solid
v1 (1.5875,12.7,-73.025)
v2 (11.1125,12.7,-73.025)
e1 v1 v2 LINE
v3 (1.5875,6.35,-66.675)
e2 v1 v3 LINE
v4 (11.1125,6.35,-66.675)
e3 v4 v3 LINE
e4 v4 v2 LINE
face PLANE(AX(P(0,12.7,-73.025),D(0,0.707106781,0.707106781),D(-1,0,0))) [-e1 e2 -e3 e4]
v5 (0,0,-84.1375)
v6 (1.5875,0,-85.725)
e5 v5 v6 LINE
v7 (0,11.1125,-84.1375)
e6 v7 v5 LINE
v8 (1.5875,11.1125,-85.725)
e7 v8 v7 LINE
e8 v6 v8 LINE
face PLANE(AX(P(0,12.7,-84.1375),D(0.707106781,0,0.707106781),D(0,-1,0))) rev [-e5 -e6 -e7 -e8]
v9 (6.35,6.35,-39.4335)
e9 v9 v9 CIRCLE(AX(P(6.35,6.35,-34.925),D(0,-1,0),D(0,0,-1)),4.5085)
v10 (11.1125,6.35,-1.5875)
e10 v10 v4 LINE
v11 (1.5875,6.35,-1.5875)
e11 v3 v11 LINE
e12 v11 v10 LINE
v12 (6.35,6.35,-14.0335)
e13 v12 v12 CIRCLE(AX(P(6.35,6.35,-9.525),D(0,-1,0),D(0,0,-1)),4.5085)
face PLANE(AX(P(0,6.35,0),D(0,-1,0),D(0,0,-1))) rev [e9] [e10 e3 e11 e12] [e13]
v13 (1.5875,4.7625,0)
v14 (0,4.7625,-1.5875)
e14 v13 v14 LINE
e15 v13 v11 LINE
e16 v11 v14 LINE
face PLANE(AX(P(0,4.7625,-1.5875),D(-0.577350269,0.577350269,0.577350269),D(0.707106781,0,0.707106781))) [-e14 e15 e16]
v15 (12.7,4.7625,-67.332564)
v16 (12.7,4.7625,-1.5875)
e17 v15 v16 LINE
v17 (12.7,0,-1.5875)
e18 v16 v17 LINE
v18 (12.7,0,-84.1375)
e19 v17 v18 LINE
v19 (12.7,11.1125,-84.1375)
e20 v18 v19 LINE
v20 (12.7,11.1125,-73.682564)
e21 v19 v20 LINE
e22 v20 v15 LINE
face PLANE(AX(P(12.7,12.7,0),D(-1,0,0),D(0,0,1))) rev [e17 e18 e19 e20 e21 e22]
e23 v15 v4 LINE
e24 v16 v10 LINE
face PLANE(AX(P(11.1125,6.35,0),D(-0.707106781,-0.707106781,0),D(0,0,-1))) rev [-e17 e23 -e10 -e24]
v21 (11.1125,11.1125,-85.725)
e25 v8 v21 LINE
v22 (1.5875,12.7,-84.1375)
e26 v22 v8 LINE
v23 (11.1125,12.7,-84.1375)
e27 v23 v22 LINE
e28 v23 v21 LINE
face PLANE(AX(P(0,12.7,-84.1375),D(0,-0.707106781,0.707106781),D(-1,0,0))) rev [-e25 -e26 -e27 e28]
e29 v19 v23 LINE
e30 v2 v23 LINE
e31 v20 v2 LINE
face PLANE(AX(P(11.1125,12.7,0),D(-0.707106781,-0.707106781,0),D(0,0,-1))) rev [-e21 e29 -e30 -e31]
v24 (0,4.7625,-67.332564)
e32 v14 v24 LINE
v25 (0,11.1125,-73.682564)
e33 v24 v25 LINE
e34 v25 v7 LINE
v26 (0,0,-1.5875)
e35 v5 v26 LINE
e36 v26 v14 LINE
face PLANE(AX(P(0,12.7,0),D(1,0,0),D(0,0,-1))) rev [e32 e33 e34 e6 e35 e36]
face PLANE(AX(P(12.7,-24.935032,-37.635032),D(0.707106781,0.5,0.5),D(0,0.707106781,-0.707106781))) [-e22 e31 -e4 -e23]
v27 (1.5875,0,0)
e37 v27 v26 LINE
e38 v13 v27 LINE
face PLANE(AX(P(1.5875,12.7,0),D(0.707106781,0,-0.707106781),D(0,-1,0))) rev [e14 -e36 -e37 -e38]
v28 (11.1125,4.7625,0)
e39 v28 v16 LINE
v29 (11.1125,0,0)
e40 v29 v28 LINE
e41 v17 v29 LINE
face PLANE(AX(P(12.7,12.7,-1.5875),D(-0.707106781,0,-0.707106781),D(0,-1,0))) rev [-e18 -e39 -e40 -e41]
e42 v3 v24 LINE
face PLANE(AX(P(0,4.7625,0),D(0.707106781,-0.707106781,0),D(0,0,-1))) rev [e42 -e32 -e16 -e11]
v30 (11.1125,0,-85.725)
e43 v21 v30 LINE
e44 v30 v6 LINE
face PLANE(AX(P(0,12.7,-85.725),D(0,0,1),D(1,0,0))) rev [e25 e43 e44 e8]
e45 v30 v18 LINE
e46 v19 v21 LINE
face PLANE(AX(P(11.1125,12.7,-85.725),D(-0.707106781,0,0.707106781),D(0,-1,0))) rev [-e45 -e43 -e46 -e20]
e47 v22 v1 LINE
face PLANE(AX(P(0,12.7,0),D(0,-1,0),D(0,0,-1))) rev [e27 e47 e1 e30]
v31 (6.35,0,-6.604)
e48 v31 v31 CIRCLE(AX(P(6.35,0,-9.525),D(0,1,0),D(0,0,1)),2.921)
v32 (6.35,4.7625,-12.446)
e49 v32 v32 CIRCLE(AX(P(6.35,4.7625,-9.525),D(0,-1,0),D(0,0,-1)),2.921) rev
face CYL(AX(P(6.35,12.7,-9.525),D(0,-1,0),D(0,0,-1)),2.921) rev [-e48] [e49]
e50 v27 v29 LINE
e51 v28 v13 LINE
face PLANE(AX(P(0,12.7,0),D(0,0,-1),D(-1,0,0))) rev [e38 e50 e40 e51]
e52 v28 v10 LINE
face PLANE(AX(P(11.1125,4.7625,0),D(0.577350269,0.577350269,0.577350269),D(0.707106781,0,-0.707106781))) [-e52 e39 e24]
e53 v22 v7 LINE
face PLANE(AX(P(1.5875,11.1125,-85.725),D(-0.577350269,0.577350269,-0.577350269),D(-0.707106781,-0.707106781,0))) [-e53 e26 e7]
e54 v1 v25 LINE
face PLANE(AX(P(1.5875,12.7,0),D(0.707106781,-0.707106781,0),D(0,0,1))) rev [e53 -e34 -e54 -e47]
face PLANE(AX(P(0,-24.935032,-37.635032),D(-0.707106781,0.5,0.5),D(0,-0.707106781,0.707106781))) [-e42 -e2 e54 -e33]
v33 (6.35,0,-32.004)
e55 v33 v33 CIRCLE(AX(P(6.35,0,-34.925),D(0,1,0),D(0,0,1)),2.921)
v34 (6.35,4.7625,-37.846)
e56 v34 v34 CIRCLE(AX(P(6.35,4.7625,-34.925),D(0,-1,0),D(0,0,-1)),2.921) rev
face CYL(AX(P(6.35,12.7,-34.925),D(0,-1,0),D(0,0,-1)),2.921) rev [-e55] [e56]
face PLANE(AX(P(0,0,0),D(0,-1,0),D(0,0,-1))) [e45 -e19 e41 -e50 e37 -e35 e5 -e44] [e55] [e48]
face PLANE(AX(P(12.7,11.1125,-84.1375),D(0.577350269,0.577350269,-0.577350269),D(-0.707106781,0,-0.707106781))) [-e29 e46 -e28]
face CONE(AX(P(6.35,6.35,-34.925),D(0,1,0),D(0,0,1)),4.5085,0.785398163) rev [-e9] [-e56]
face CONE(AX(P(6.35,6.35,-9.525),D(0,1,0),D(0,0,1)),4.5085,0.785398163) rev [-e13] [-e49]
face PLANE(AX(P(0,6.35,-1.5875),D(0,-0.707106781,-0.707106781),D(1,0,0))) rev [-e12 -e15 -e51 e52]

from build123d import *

# Parameters (mm, degrees)
SKETCH1_W           = 12.7
SKETCH1_H           = 85.725
SKETCH1_R           = 2.921
BOSS_EXTRUDE1_DEPTH = 12.7
SKETCH2_W           = 73.025
SKETCH2_H           = 6.35
CUT_EXTRUDE1_DEPTH  = 88.586275323
CHAMFER1_SIZE       = 6.35


# Some blends are built 0.0001 mm under size
with BuildPart() as part:
    # Sketch1 → Boss-Extrude1 (new body)
    with BuildSketch(Plane(origin=(0, 0, 0), x_dir=(1, 0, 0), z_dir=(0, 1, 0))):
        with Locations((6.35, 42.8625)):
            Rectangle(SKETCH1_W, SKETCH1_H)
        with Locations(Location((6.35, 9.525, 0), (0, 0, 270))):
            Circle(SKETCH1_R, mode=Mode.SUBTRACT)
        with Locations(Location((6.35, 34.925, 0), (0, 0, 270))):
            Circle(SKETCH1_R, mode=Mode.SUBTRACT)
    extrude(amount=BOSS_EXTRUDE1_DEPTH)

    # Sketch2 → Cut-Extrude1 (cut, through all)
    with BuildSketch(Plane(origin=(12.7, 0, 0), x_dir=(0, 0, -1), z_dir=(1, 0, 0))):
        with Locations((36.5125, 9.525)):
            Rectangle(SKETCH2_W, SKETCH2_H)
    extrude(amount=-CUT_EXTRUDE1_DEPTH, mode=Mode.SUBTRACT)

    # Chamfer1
    chamfer1_edges = [part.edges().sort_by_distance(p)[0] for p in [
        (6.35, 6.35, -73.025),
    ]]
    chamfer(chamfer1_edges, length=CHAMFER1_SIZE - 0.0001)  # a hair under: the kernel refuses the full size

    # Chamfer2
    # the kernel refuses this chamfer: 1.5875 mm, written as the material it takes off along each edge
    with BuildSketch(Plane(origin=(11.641666667, 11.641666667, -84.666666667), x_dir=(-0.7071067811865476, 0.7071067811865476, 0), z_dir=(0.5773502691896264, 0.5773502691896264, -0.5773502691896245)), Plane(origin=(1.058333333, 5.291666667, -1.058333333), x_dir=(0.7071067811865476, 0.7071067811865476, 0), z_dir=(-0.5773502691896265, 0.5773502691896265, 0.5773502691896244))) as chamfer2_piece_1:
        Polygon((-1.122532015, 0.648094161), (1.122532015, 0.648094161), (0, -1.296188322), align=None)
    extrude(amount=2.016395815, mode=Mode.SUBTRACT)
    with BuildSketch(Plane(origin=(1.058333333, 11.641666667, -84.666666667), x_dir=(0.7071067811865476, 0.7071067811865476, 0), z_dir=(-0.5773502691896264, 0.5773502691896264, -0.5773502691896245)), Plane(origin=(11.641666667, 5.291666667, -1.058333333), x_dir=(-0.7071067811865476, 0.7071067811865476, -2.571490011072639e-15), z_dir=(0.577350269189625, 0.5773502691896271, 0.5773502691896252))) as chamfer2_piece_2:
        Polygon((-1.122532015, -0.648094161), (1.122532015, -0.648094161), (0, 1.296188322), align=None)
    extrude(amount=2.016395815, mode=Mode.SUBTRACT)
    with BuildSketch(Plane(origin=(16.782546743, 12.7, -85.725), x_dir=(0, 0.027495876610586667, 0.9996219169112968), z_dir=(-1, 0, 0)), Plane(origin=(0, 12.7, -89.807546743), x_dir=(0.9996219169112968, 0.02749587661058674, 0), z_dir=(0, 0, 1)), Plane(origin=(0, -4.082546743, -85.725), x_dir=(0.9996219169112968, 0, -0.02749587661058565), z_dir=(0, 1, 0)), Plane(origin=(12.7, -4.082546743, -85.725), x_dir=(0.027495876610586667, 0, 0.9996219169112968), z_dir=(0, 1, 0))) as chamfer2_piece_3:
        with BuildLine():
            Line((1.633018697, 0), (-0.089768608, -1.630549497))
            Line((-0.089768608, -1.630549497), (-0.121506604, -1.629676503))
            ThreePointArc((-0.121506604, -1.629676503), (-0.054180148, -0.815019055), (-0.031737996, 0.000872994))
            Line((-0.031737996, 0.000872994), (0.000872994, 0.031737996))
            ThreePointArc((0.000872994, 0.031737996), (0.816765043, 0.009295844), (1.633891691, 0.031737996))
            Line((1.633891691, 0.031737996), (1.633018697, 0))
        make_face()
    extrude(amount=20.865093487, mode=Mode.SUBTRACT)
    with BuildSketch(Plane(origin=(12.7, 12.7, -68.942453257), x_dir=(0.027495876610586726, -0.9996219169112968, 0), z_dir=(0, 0, -1)), Plane(origin=(16.782546743, 6.35, 0), x_dir=(0, 0.027495876610586098, -0.9996219169112966), z_dir=(-1, 0, 0))) as chamfer2_piece_4:
        with BuildLine():
            Line((1.633018697, 0), (-0.089768608, 1.630549497))
            Line((-0.089768608, 1.630549497), (-0.121506604, 1.629676503))
            ThreePointArc((-0.121506604, 1.629676503), (-0.054180148, 0.815019055), (-0.031737996, -0.000872994))
            Line((-0.031737996, -0.000872994), (0.000872994, -0.031737996))
            ThreePointArc((0.000872994, -0.031737996), (0.816765043, -0.009295844), (1.633891691, -0.031737996))
            Line((1.633891691, -0.031737996), (1.633018697, 0))
        make_face()
    extrude(amount=20.865093487, mode=Mode.SUBTRACT)
    with BuildSketch(Plane(origin=(12.7, -4.082546743, 0), x_dir=(0.027495876610586743, 0, -0.9996219169112966), z_dir=(0, 1, 0)), Plane(origin=(0, -4.082546743, 0), x_dir=(0.9996219169112966, 0, 0.027495876610586424), z_dir=(0, 1, 0))) as chamfer2_piece_5:
        with BuildLine():
            Line((1.633018697, 0), (-0.089768608, 1.630549497))
            Line((-0.089768608, 1.630549497), (-0.121506604, 1.629676503))
            ThreePointArc((-0.121506604, 1.629676503), (-0.054180148, 0.815019055), (-0.031737996, -0.000872994))
            Line((-0.031737996, -0.000872994), (0.000872994, -0.031737996))
            ThreePointArc((0.000872994, -0.031737996), (0.816765043, -0.009295844), (1.633891691, -0.031737996))
            Line((1.633891691, -0.031737996), (1.633018697, 0))
        make_face()
    extrude(amount=14.515093487, mode=Mode.SUBTRACT)
    with BuildSketch(Plane(origin=(6.35, 6.35, -9.525), x_dir=(0, 0, 1), z_dir=(1, 0, 0))) as chamfer2_piece_6:
        with BuildLine():
            Line((4.553401281, -0.044901281), (2.876098719, 1.632401281))
            Line((2.876098719, 1.632401281), (2.844348719, 1.632401281))
            ThreePointArc((2.844348719, 1.632401281), (2.88925, 0.81620064), (2.88925, 0))
            Line((2.88925, 0), (2.921, -0.03175))
            ThreePointArc((2.921, -0.03175), (3.73720064, -0.03175), (4.553401281, -0.076651281))
            Line((4.553401281, -0.076651281), (4.553401281, -0.044901281))
        make_face()
    revolve(axis=Axis((6.35, 6.35, -9.525), (0, -1, 0)), mode=Mode.SUBTRACT)
    with BuildSketch(Plane(origin=(6.35, 6.35, -34.925), x_dir=(0, 0, 1), z_dir=(1, 0, 0))) as chamfer2_piece_7:
        with BuildLine():
            Line((4.553401281, -0.044901281), (2.876098719, 1.632401281))
            Line((2.876098719, 1.632401281), (2.844348719, 1.632401281))
            ThreePointArc((2.844348719, 1.632401281), (2.88925, 0.81620064), (2.88925, 0))
            Line((2.88925, 0), (2.921, -0.03175))
            ThreePointArc((2.921, -0.03175), (3.73720064, -0.03175), (4.553401281, -0.076651281))
            Line((4.553401281, -0.076651281), (4.553401281, -0.044901281))
        make_face()
    revolve(axis=Axis((6.35, 6.35, -34.925), (0, -1, 0)), mode=Mode.SUBTRACT)
    with BuildSketch(Plane(origin=(0, 6.35, -70.757646743), x_dir=(0.9996219169112968, 0.027495876610586195, 0), z_dir=(0, 0, 1))) as chamfer2_piece_8_section:
        with BuildLine():
            Line((1.633018697, 0), (-0.089768608, -1.630549497))
            Line((-0.089768608, -1.630549497), (-0.121506604, -1.629676503))
            ThreePointArc((-0.121506604, -1.629676503), (-0.054180148, -0.815019055), (-0.031737996, 0.000872994))
            Line((-0.031737996, 0.000872994), (0.000872994, 0.031737996))
            ThreePointArc((0.000872994, 0.031737996), (0.816765043, 0.009295844), (1.633891691, 0.031737996))
            Line((1.633891691, 0.031737996), (1.633018697, 0))
        make_face()
    chamfer2_piece_8 = extrude(amount=74.840193487, mode=Mode.PRIVATE)
    chamfer2_piece_8 = split(chamfer2_piece_8, bisect_by=Plane(origin=(0.524765539, -11.730363263, -48.594736737), z_dir=(0, 0.7071067811865479, 0.7071067811865472)), keep=Keep.TOP, mode=Mode.PRIVATE)
    add(chamfer2_piece_8, mode=Mode.SUBTRACT)
    with BuildSketch(Plane(origin=(12.7, 6.35, -70.757646743), x_dir=(0.02749587661058674, -0.9996219169112966, 0), z_dir=(0, 0, 1))) as chamfer2_piece_9_section:
        with BuildLine():
            Line((1.633018697, 0), (-0.089768608, -1.630549497))
            Line((-0.089768608, -1.630549497), (-0.121506604, -1.629676503))
            ThreePointArc((-0.121506604, -1.629676503), (-0.054180148, -0.815019055), (-0.031737996, 0.000872994))
            Line((-0.031737996, 0.000872994), (0.000872994, 0.031737996))
            ThreePointArc((0.000872994, 0.031737996), (0.816765043, 0.009295844), (1.633891691, 0.031737996))
            Line((1.633891691, 0.031737996), (1.633018697, 0))
        make_face()
    chamfer2_piece_9 = extrude(amount=74.840193487, mode=Mode.PRIVATE)
    chamfer2_piece_9 = split(chamfer2_piece_9, bisect_by=Plane(origin=(12.175234461, -11.730363263, -48.594736737), z_dir=(0, 0.7071067811865479, 0.7071067811865472)), keep=Keep.TOP, mode=Mode.PRIVATE)
    add(chamfer2_piece_9, mode=Mode.SUBTRACT)
    with BuildSketch(Plane(origin=(12.7, 3.463203513, -63.788303513), x_dir=(0.02749587661058664, -0.7068394360706738, -0.7068394360706732), z_dir=(0, 0.7071067811865472, -0.7071067811865479))) as chamfer2_piece_10_section:
        with BuildLine():
            Line((1.633018697, 0), (-0.089768608, 1.630549497))
            Line((-0.089768608, 1.630549497), (-0.121506604, 1.629676503))
            ThreePointArc((-0.121506604, 1.629676503), (-0.054180148, 0.815019055), (-0.031737996, -0.000872994))
            Line((-0.031737996, -0.000872994), (0.000872994, -0.031737996))
            ThreePointArc((0.000872994, -0.031737996), (0.816765043, -0.009295844), (1.633891691, -0.031737996))
            Line((1.633891691, -0.031737996), (1.633018697, 0))
        make_face()
    chamfer2_piece_10 = extrude(amount=17.145208187, mode=Mode.PRIVATE)
    chamfer2_piece_10 = split(chamfer2_piece_10, bisect_by=Plane(origin=(12.154882998, 6.35, -70.191724347), z_dir=(0, 1, 0)), keep=Keep.TOP, mode=Mode.PRIVATE)
    add(chamfer2_piece_10, mode=Mode.SUBTRACT)
    with BuildSketch(Plane(origin=(0, 3.463203513, -63.788303513), x_dir=(0.9996219169112968, 0.019442520806014586, 0.019442520806014572), z_dir=(0, 0.7071067811865472, -0.7071067811865479))) as chamfer2_piece_11_section:
        with BuildLine():
            Line((1.633018697, 0), (-0.089768608, 1.630549497))
            Line((-0.089768608, 1.630549497), (-0.121506604, 1.629676503))
            ThreePointArc((-0.121506604, 1.629676503), (-0.054180148, 0.815019055), (-0.031737996, -0.000872994))
            Line((-0.031737996, -0.000872994), (0.000872994, -0.031737996))
            ThreePointArc((0.000872994, -0.031737996), (0.816765043, -0.009295844), (1.633891691, -0.031737996))
            Line((1.633891691, -0.031737996), (1.633018697, 0))
        make_face()
    chamfer2_piece_11 = extrude(amount=17.145208187, mode=Mode.PRIVATE)
    chamfer2_piece_11 = split(chamfer2_piece_11, bisect_by=Plane(origin=(0.545117002, 6.35, -70.191724347), z_dir=(0, 1, 0)), keep=Keep.TOP, mode=Mode.PRIVATE)
    add(chamfer2_piece_11, mode=Mode.SUBTRACT)
    with BuildSketch(Plane(origin=(0, 3.463203513, -63.788303513), x_dir=(0.9996219169112968, 0.019442520806014586, 0.019442520806014572), z_dir=(0, 0.7071067811865472, -0.7071067811865479))) as chamfer2_piece_12a_section:
        with BuildLine():
            Line((1.633018697, 0), (-0.089768608, 1.630549497))
            Line((-0.089768608, 1.630549497), (-0.121506604, 1.629676503))
            ThreePointArc((-0.121506604, 1.629676503), (-0.054180148, 0.815019055), (-0.031737996, -0.000872994))
            Line((-0.031737996, -0.000872994), (0.000872994, -0.031737996))
            ThreePointArc((0.000872994, -0.031737996), (0.816765043, -0.009295844), (1.633891691, -0.031737996))
            Line((1.633891691, -0.031737996), (1.633018697, 0))
        make_face()
    chamfer2_piece_12a = extrude(amount=17.145208187, mode=Mode.PRIVATE)
    chamfer2_piece_12a = split(chamfer2_piece_12a, bisect_by=Plane(origin=(0.504972836, 6.35, -65.823859696), z_dir=(0, -1, 0)), keep=Keep.TOP, mode=Mode.PRIVATE)
    with BuildSketch(Plane(origin=(0, 6.35, -70.757646743), x_dir=(0.9996219169112968, 0.027495876610586195, 0), z_dir=(0, 0, 1))) as chamfer2_piece_12b_section:
        with BuildLine():
            Line((1.633018697, 0), (-0.089768608, -1.630549497))
            Line((-0.089768608, -1.630549497), (-0.121506604, -1.629676503))
            ThreePointArc((-0.121506604, -1.629676503), (-0.054180148, -0.815019055), (-0.031737996, 0.000872994))
            Line((-0.031737996, 0.000872994), (0.000872994, 0.031737996))
            ThreePointArc((0.000872994, 0.031737996), (0.816765043, 0.009295844), (1.633891691, 0.031737996))
            Line((1.633891691, 0.031737996), (1.633018697, 0))
        make_face()
    chamfer2_piece_12b = extrude(amount=74.840193487, mode=Mode.PRIVATE)
    chamfer2_piece_12b = split(chamfer2_piece_12b, bisect_by=Plane(origin=(0.504972836, 6.951917791, -67.277017791), z_dir=(0, -0.7071067811865479, -0.7071067811865472)), keep=Keep.TOP, mode=Mode.PRIVATE)
    chamfer2_piece_12 = chamfer2_piece_12a & chamfer2_piece_12b
    add(chamfer2_piece_12, mode=Mode.SUBTRACT)
    with BuildSketch(Plane(origin=(12.7, 3.463203513, -63.788303513), x_dir=(0.02749587661058664, -0.7068394360706738, -0.7068394360706732), z_dir=(0, 0.7071067811865472, -0.7071067811865479))) as chamfer2_piece_13a_section:
        with BuildLine():
            Line((1.633018697, 0), (-0.089768608, 1.630549497))
            Line((-0.089768608, 1.630549497), (-0.121506604, 1.629676503))
            ThreePointArc((-0.121506604, 1.629676503), (-0.054180148, 0.815019055), (-0.031737996, -0.000872994))
            Line((-0.031737996, -0.000872994), (0.000872994, -0.031737996))
            ThreePointArc((0.000872994, -0.031737996), (0.816765043, -0.009295844), (1.633891691, -0.031737996))
            Line((1.633891691, -0.031737996), (1.633018697, 0))
        make_face()
    chamfer2_piece_13a = extrude(amount=17.145208187, mode=Mode.PRIVATE)
    chamfer2_piece_13a = split(chamfer2_piece_13a, bisect_by=Plane(origin=(12.195027164, 6.35, -65.823859696), z_dir=(0, -1, 0)), keep=Keep.TOP, mode=Mode.PRIVATE)
    with BuildSketch(Plane(origin=(12.7, 6.35, -70.757646743), x_dir=(0.02749587661058674, -0.9996219169112966, 0), z_dir=(0, 0, 1))) as chamfer2_piece_13b_section:
        with BuildLine():
            Line((1.633018697, 0), (-0.089768608, -1.630549497))
            Line((-0.089768608, -1.630549497), (-0.121506604, -1.629676503))
            ThreePointArc((-0.121506604, -1.629676503), (-0.054180148, -0.815019055), (-0.031737996, 0.000872994))
            Line((-0.031737996, 0.000872994), (0.000872994, 0.031737996))
            ThreePointArc((0.000872994, 0.031737996), (0.816765043, 0.009295844), (1.633891691, 0.031737996))
            Line((1.633891691, 0.031737996), (1.633018697, 0))
        make_face()
    chamfer2_piece_13b = extrude(amount=74.840193487, mode=Mode.PRIVATE)
    chamfer2_piece_13b = split(chamfer2_piece_13b, bisect_by=Plane(origin=(12.195027164, 6.951917791, -67.277017791), z_dir=(0, -0.7071067811865479, -0.7071067811865472)), keep=Keep.TOP, mode=Mode.PRIVATE)
    chamfer2_piece_13 = chamfer2_piece_13a & chamfer2_piece_13b
    add(chamfer2_piece_13, mode=Mode.SUBTRACT)


solid = part.part
